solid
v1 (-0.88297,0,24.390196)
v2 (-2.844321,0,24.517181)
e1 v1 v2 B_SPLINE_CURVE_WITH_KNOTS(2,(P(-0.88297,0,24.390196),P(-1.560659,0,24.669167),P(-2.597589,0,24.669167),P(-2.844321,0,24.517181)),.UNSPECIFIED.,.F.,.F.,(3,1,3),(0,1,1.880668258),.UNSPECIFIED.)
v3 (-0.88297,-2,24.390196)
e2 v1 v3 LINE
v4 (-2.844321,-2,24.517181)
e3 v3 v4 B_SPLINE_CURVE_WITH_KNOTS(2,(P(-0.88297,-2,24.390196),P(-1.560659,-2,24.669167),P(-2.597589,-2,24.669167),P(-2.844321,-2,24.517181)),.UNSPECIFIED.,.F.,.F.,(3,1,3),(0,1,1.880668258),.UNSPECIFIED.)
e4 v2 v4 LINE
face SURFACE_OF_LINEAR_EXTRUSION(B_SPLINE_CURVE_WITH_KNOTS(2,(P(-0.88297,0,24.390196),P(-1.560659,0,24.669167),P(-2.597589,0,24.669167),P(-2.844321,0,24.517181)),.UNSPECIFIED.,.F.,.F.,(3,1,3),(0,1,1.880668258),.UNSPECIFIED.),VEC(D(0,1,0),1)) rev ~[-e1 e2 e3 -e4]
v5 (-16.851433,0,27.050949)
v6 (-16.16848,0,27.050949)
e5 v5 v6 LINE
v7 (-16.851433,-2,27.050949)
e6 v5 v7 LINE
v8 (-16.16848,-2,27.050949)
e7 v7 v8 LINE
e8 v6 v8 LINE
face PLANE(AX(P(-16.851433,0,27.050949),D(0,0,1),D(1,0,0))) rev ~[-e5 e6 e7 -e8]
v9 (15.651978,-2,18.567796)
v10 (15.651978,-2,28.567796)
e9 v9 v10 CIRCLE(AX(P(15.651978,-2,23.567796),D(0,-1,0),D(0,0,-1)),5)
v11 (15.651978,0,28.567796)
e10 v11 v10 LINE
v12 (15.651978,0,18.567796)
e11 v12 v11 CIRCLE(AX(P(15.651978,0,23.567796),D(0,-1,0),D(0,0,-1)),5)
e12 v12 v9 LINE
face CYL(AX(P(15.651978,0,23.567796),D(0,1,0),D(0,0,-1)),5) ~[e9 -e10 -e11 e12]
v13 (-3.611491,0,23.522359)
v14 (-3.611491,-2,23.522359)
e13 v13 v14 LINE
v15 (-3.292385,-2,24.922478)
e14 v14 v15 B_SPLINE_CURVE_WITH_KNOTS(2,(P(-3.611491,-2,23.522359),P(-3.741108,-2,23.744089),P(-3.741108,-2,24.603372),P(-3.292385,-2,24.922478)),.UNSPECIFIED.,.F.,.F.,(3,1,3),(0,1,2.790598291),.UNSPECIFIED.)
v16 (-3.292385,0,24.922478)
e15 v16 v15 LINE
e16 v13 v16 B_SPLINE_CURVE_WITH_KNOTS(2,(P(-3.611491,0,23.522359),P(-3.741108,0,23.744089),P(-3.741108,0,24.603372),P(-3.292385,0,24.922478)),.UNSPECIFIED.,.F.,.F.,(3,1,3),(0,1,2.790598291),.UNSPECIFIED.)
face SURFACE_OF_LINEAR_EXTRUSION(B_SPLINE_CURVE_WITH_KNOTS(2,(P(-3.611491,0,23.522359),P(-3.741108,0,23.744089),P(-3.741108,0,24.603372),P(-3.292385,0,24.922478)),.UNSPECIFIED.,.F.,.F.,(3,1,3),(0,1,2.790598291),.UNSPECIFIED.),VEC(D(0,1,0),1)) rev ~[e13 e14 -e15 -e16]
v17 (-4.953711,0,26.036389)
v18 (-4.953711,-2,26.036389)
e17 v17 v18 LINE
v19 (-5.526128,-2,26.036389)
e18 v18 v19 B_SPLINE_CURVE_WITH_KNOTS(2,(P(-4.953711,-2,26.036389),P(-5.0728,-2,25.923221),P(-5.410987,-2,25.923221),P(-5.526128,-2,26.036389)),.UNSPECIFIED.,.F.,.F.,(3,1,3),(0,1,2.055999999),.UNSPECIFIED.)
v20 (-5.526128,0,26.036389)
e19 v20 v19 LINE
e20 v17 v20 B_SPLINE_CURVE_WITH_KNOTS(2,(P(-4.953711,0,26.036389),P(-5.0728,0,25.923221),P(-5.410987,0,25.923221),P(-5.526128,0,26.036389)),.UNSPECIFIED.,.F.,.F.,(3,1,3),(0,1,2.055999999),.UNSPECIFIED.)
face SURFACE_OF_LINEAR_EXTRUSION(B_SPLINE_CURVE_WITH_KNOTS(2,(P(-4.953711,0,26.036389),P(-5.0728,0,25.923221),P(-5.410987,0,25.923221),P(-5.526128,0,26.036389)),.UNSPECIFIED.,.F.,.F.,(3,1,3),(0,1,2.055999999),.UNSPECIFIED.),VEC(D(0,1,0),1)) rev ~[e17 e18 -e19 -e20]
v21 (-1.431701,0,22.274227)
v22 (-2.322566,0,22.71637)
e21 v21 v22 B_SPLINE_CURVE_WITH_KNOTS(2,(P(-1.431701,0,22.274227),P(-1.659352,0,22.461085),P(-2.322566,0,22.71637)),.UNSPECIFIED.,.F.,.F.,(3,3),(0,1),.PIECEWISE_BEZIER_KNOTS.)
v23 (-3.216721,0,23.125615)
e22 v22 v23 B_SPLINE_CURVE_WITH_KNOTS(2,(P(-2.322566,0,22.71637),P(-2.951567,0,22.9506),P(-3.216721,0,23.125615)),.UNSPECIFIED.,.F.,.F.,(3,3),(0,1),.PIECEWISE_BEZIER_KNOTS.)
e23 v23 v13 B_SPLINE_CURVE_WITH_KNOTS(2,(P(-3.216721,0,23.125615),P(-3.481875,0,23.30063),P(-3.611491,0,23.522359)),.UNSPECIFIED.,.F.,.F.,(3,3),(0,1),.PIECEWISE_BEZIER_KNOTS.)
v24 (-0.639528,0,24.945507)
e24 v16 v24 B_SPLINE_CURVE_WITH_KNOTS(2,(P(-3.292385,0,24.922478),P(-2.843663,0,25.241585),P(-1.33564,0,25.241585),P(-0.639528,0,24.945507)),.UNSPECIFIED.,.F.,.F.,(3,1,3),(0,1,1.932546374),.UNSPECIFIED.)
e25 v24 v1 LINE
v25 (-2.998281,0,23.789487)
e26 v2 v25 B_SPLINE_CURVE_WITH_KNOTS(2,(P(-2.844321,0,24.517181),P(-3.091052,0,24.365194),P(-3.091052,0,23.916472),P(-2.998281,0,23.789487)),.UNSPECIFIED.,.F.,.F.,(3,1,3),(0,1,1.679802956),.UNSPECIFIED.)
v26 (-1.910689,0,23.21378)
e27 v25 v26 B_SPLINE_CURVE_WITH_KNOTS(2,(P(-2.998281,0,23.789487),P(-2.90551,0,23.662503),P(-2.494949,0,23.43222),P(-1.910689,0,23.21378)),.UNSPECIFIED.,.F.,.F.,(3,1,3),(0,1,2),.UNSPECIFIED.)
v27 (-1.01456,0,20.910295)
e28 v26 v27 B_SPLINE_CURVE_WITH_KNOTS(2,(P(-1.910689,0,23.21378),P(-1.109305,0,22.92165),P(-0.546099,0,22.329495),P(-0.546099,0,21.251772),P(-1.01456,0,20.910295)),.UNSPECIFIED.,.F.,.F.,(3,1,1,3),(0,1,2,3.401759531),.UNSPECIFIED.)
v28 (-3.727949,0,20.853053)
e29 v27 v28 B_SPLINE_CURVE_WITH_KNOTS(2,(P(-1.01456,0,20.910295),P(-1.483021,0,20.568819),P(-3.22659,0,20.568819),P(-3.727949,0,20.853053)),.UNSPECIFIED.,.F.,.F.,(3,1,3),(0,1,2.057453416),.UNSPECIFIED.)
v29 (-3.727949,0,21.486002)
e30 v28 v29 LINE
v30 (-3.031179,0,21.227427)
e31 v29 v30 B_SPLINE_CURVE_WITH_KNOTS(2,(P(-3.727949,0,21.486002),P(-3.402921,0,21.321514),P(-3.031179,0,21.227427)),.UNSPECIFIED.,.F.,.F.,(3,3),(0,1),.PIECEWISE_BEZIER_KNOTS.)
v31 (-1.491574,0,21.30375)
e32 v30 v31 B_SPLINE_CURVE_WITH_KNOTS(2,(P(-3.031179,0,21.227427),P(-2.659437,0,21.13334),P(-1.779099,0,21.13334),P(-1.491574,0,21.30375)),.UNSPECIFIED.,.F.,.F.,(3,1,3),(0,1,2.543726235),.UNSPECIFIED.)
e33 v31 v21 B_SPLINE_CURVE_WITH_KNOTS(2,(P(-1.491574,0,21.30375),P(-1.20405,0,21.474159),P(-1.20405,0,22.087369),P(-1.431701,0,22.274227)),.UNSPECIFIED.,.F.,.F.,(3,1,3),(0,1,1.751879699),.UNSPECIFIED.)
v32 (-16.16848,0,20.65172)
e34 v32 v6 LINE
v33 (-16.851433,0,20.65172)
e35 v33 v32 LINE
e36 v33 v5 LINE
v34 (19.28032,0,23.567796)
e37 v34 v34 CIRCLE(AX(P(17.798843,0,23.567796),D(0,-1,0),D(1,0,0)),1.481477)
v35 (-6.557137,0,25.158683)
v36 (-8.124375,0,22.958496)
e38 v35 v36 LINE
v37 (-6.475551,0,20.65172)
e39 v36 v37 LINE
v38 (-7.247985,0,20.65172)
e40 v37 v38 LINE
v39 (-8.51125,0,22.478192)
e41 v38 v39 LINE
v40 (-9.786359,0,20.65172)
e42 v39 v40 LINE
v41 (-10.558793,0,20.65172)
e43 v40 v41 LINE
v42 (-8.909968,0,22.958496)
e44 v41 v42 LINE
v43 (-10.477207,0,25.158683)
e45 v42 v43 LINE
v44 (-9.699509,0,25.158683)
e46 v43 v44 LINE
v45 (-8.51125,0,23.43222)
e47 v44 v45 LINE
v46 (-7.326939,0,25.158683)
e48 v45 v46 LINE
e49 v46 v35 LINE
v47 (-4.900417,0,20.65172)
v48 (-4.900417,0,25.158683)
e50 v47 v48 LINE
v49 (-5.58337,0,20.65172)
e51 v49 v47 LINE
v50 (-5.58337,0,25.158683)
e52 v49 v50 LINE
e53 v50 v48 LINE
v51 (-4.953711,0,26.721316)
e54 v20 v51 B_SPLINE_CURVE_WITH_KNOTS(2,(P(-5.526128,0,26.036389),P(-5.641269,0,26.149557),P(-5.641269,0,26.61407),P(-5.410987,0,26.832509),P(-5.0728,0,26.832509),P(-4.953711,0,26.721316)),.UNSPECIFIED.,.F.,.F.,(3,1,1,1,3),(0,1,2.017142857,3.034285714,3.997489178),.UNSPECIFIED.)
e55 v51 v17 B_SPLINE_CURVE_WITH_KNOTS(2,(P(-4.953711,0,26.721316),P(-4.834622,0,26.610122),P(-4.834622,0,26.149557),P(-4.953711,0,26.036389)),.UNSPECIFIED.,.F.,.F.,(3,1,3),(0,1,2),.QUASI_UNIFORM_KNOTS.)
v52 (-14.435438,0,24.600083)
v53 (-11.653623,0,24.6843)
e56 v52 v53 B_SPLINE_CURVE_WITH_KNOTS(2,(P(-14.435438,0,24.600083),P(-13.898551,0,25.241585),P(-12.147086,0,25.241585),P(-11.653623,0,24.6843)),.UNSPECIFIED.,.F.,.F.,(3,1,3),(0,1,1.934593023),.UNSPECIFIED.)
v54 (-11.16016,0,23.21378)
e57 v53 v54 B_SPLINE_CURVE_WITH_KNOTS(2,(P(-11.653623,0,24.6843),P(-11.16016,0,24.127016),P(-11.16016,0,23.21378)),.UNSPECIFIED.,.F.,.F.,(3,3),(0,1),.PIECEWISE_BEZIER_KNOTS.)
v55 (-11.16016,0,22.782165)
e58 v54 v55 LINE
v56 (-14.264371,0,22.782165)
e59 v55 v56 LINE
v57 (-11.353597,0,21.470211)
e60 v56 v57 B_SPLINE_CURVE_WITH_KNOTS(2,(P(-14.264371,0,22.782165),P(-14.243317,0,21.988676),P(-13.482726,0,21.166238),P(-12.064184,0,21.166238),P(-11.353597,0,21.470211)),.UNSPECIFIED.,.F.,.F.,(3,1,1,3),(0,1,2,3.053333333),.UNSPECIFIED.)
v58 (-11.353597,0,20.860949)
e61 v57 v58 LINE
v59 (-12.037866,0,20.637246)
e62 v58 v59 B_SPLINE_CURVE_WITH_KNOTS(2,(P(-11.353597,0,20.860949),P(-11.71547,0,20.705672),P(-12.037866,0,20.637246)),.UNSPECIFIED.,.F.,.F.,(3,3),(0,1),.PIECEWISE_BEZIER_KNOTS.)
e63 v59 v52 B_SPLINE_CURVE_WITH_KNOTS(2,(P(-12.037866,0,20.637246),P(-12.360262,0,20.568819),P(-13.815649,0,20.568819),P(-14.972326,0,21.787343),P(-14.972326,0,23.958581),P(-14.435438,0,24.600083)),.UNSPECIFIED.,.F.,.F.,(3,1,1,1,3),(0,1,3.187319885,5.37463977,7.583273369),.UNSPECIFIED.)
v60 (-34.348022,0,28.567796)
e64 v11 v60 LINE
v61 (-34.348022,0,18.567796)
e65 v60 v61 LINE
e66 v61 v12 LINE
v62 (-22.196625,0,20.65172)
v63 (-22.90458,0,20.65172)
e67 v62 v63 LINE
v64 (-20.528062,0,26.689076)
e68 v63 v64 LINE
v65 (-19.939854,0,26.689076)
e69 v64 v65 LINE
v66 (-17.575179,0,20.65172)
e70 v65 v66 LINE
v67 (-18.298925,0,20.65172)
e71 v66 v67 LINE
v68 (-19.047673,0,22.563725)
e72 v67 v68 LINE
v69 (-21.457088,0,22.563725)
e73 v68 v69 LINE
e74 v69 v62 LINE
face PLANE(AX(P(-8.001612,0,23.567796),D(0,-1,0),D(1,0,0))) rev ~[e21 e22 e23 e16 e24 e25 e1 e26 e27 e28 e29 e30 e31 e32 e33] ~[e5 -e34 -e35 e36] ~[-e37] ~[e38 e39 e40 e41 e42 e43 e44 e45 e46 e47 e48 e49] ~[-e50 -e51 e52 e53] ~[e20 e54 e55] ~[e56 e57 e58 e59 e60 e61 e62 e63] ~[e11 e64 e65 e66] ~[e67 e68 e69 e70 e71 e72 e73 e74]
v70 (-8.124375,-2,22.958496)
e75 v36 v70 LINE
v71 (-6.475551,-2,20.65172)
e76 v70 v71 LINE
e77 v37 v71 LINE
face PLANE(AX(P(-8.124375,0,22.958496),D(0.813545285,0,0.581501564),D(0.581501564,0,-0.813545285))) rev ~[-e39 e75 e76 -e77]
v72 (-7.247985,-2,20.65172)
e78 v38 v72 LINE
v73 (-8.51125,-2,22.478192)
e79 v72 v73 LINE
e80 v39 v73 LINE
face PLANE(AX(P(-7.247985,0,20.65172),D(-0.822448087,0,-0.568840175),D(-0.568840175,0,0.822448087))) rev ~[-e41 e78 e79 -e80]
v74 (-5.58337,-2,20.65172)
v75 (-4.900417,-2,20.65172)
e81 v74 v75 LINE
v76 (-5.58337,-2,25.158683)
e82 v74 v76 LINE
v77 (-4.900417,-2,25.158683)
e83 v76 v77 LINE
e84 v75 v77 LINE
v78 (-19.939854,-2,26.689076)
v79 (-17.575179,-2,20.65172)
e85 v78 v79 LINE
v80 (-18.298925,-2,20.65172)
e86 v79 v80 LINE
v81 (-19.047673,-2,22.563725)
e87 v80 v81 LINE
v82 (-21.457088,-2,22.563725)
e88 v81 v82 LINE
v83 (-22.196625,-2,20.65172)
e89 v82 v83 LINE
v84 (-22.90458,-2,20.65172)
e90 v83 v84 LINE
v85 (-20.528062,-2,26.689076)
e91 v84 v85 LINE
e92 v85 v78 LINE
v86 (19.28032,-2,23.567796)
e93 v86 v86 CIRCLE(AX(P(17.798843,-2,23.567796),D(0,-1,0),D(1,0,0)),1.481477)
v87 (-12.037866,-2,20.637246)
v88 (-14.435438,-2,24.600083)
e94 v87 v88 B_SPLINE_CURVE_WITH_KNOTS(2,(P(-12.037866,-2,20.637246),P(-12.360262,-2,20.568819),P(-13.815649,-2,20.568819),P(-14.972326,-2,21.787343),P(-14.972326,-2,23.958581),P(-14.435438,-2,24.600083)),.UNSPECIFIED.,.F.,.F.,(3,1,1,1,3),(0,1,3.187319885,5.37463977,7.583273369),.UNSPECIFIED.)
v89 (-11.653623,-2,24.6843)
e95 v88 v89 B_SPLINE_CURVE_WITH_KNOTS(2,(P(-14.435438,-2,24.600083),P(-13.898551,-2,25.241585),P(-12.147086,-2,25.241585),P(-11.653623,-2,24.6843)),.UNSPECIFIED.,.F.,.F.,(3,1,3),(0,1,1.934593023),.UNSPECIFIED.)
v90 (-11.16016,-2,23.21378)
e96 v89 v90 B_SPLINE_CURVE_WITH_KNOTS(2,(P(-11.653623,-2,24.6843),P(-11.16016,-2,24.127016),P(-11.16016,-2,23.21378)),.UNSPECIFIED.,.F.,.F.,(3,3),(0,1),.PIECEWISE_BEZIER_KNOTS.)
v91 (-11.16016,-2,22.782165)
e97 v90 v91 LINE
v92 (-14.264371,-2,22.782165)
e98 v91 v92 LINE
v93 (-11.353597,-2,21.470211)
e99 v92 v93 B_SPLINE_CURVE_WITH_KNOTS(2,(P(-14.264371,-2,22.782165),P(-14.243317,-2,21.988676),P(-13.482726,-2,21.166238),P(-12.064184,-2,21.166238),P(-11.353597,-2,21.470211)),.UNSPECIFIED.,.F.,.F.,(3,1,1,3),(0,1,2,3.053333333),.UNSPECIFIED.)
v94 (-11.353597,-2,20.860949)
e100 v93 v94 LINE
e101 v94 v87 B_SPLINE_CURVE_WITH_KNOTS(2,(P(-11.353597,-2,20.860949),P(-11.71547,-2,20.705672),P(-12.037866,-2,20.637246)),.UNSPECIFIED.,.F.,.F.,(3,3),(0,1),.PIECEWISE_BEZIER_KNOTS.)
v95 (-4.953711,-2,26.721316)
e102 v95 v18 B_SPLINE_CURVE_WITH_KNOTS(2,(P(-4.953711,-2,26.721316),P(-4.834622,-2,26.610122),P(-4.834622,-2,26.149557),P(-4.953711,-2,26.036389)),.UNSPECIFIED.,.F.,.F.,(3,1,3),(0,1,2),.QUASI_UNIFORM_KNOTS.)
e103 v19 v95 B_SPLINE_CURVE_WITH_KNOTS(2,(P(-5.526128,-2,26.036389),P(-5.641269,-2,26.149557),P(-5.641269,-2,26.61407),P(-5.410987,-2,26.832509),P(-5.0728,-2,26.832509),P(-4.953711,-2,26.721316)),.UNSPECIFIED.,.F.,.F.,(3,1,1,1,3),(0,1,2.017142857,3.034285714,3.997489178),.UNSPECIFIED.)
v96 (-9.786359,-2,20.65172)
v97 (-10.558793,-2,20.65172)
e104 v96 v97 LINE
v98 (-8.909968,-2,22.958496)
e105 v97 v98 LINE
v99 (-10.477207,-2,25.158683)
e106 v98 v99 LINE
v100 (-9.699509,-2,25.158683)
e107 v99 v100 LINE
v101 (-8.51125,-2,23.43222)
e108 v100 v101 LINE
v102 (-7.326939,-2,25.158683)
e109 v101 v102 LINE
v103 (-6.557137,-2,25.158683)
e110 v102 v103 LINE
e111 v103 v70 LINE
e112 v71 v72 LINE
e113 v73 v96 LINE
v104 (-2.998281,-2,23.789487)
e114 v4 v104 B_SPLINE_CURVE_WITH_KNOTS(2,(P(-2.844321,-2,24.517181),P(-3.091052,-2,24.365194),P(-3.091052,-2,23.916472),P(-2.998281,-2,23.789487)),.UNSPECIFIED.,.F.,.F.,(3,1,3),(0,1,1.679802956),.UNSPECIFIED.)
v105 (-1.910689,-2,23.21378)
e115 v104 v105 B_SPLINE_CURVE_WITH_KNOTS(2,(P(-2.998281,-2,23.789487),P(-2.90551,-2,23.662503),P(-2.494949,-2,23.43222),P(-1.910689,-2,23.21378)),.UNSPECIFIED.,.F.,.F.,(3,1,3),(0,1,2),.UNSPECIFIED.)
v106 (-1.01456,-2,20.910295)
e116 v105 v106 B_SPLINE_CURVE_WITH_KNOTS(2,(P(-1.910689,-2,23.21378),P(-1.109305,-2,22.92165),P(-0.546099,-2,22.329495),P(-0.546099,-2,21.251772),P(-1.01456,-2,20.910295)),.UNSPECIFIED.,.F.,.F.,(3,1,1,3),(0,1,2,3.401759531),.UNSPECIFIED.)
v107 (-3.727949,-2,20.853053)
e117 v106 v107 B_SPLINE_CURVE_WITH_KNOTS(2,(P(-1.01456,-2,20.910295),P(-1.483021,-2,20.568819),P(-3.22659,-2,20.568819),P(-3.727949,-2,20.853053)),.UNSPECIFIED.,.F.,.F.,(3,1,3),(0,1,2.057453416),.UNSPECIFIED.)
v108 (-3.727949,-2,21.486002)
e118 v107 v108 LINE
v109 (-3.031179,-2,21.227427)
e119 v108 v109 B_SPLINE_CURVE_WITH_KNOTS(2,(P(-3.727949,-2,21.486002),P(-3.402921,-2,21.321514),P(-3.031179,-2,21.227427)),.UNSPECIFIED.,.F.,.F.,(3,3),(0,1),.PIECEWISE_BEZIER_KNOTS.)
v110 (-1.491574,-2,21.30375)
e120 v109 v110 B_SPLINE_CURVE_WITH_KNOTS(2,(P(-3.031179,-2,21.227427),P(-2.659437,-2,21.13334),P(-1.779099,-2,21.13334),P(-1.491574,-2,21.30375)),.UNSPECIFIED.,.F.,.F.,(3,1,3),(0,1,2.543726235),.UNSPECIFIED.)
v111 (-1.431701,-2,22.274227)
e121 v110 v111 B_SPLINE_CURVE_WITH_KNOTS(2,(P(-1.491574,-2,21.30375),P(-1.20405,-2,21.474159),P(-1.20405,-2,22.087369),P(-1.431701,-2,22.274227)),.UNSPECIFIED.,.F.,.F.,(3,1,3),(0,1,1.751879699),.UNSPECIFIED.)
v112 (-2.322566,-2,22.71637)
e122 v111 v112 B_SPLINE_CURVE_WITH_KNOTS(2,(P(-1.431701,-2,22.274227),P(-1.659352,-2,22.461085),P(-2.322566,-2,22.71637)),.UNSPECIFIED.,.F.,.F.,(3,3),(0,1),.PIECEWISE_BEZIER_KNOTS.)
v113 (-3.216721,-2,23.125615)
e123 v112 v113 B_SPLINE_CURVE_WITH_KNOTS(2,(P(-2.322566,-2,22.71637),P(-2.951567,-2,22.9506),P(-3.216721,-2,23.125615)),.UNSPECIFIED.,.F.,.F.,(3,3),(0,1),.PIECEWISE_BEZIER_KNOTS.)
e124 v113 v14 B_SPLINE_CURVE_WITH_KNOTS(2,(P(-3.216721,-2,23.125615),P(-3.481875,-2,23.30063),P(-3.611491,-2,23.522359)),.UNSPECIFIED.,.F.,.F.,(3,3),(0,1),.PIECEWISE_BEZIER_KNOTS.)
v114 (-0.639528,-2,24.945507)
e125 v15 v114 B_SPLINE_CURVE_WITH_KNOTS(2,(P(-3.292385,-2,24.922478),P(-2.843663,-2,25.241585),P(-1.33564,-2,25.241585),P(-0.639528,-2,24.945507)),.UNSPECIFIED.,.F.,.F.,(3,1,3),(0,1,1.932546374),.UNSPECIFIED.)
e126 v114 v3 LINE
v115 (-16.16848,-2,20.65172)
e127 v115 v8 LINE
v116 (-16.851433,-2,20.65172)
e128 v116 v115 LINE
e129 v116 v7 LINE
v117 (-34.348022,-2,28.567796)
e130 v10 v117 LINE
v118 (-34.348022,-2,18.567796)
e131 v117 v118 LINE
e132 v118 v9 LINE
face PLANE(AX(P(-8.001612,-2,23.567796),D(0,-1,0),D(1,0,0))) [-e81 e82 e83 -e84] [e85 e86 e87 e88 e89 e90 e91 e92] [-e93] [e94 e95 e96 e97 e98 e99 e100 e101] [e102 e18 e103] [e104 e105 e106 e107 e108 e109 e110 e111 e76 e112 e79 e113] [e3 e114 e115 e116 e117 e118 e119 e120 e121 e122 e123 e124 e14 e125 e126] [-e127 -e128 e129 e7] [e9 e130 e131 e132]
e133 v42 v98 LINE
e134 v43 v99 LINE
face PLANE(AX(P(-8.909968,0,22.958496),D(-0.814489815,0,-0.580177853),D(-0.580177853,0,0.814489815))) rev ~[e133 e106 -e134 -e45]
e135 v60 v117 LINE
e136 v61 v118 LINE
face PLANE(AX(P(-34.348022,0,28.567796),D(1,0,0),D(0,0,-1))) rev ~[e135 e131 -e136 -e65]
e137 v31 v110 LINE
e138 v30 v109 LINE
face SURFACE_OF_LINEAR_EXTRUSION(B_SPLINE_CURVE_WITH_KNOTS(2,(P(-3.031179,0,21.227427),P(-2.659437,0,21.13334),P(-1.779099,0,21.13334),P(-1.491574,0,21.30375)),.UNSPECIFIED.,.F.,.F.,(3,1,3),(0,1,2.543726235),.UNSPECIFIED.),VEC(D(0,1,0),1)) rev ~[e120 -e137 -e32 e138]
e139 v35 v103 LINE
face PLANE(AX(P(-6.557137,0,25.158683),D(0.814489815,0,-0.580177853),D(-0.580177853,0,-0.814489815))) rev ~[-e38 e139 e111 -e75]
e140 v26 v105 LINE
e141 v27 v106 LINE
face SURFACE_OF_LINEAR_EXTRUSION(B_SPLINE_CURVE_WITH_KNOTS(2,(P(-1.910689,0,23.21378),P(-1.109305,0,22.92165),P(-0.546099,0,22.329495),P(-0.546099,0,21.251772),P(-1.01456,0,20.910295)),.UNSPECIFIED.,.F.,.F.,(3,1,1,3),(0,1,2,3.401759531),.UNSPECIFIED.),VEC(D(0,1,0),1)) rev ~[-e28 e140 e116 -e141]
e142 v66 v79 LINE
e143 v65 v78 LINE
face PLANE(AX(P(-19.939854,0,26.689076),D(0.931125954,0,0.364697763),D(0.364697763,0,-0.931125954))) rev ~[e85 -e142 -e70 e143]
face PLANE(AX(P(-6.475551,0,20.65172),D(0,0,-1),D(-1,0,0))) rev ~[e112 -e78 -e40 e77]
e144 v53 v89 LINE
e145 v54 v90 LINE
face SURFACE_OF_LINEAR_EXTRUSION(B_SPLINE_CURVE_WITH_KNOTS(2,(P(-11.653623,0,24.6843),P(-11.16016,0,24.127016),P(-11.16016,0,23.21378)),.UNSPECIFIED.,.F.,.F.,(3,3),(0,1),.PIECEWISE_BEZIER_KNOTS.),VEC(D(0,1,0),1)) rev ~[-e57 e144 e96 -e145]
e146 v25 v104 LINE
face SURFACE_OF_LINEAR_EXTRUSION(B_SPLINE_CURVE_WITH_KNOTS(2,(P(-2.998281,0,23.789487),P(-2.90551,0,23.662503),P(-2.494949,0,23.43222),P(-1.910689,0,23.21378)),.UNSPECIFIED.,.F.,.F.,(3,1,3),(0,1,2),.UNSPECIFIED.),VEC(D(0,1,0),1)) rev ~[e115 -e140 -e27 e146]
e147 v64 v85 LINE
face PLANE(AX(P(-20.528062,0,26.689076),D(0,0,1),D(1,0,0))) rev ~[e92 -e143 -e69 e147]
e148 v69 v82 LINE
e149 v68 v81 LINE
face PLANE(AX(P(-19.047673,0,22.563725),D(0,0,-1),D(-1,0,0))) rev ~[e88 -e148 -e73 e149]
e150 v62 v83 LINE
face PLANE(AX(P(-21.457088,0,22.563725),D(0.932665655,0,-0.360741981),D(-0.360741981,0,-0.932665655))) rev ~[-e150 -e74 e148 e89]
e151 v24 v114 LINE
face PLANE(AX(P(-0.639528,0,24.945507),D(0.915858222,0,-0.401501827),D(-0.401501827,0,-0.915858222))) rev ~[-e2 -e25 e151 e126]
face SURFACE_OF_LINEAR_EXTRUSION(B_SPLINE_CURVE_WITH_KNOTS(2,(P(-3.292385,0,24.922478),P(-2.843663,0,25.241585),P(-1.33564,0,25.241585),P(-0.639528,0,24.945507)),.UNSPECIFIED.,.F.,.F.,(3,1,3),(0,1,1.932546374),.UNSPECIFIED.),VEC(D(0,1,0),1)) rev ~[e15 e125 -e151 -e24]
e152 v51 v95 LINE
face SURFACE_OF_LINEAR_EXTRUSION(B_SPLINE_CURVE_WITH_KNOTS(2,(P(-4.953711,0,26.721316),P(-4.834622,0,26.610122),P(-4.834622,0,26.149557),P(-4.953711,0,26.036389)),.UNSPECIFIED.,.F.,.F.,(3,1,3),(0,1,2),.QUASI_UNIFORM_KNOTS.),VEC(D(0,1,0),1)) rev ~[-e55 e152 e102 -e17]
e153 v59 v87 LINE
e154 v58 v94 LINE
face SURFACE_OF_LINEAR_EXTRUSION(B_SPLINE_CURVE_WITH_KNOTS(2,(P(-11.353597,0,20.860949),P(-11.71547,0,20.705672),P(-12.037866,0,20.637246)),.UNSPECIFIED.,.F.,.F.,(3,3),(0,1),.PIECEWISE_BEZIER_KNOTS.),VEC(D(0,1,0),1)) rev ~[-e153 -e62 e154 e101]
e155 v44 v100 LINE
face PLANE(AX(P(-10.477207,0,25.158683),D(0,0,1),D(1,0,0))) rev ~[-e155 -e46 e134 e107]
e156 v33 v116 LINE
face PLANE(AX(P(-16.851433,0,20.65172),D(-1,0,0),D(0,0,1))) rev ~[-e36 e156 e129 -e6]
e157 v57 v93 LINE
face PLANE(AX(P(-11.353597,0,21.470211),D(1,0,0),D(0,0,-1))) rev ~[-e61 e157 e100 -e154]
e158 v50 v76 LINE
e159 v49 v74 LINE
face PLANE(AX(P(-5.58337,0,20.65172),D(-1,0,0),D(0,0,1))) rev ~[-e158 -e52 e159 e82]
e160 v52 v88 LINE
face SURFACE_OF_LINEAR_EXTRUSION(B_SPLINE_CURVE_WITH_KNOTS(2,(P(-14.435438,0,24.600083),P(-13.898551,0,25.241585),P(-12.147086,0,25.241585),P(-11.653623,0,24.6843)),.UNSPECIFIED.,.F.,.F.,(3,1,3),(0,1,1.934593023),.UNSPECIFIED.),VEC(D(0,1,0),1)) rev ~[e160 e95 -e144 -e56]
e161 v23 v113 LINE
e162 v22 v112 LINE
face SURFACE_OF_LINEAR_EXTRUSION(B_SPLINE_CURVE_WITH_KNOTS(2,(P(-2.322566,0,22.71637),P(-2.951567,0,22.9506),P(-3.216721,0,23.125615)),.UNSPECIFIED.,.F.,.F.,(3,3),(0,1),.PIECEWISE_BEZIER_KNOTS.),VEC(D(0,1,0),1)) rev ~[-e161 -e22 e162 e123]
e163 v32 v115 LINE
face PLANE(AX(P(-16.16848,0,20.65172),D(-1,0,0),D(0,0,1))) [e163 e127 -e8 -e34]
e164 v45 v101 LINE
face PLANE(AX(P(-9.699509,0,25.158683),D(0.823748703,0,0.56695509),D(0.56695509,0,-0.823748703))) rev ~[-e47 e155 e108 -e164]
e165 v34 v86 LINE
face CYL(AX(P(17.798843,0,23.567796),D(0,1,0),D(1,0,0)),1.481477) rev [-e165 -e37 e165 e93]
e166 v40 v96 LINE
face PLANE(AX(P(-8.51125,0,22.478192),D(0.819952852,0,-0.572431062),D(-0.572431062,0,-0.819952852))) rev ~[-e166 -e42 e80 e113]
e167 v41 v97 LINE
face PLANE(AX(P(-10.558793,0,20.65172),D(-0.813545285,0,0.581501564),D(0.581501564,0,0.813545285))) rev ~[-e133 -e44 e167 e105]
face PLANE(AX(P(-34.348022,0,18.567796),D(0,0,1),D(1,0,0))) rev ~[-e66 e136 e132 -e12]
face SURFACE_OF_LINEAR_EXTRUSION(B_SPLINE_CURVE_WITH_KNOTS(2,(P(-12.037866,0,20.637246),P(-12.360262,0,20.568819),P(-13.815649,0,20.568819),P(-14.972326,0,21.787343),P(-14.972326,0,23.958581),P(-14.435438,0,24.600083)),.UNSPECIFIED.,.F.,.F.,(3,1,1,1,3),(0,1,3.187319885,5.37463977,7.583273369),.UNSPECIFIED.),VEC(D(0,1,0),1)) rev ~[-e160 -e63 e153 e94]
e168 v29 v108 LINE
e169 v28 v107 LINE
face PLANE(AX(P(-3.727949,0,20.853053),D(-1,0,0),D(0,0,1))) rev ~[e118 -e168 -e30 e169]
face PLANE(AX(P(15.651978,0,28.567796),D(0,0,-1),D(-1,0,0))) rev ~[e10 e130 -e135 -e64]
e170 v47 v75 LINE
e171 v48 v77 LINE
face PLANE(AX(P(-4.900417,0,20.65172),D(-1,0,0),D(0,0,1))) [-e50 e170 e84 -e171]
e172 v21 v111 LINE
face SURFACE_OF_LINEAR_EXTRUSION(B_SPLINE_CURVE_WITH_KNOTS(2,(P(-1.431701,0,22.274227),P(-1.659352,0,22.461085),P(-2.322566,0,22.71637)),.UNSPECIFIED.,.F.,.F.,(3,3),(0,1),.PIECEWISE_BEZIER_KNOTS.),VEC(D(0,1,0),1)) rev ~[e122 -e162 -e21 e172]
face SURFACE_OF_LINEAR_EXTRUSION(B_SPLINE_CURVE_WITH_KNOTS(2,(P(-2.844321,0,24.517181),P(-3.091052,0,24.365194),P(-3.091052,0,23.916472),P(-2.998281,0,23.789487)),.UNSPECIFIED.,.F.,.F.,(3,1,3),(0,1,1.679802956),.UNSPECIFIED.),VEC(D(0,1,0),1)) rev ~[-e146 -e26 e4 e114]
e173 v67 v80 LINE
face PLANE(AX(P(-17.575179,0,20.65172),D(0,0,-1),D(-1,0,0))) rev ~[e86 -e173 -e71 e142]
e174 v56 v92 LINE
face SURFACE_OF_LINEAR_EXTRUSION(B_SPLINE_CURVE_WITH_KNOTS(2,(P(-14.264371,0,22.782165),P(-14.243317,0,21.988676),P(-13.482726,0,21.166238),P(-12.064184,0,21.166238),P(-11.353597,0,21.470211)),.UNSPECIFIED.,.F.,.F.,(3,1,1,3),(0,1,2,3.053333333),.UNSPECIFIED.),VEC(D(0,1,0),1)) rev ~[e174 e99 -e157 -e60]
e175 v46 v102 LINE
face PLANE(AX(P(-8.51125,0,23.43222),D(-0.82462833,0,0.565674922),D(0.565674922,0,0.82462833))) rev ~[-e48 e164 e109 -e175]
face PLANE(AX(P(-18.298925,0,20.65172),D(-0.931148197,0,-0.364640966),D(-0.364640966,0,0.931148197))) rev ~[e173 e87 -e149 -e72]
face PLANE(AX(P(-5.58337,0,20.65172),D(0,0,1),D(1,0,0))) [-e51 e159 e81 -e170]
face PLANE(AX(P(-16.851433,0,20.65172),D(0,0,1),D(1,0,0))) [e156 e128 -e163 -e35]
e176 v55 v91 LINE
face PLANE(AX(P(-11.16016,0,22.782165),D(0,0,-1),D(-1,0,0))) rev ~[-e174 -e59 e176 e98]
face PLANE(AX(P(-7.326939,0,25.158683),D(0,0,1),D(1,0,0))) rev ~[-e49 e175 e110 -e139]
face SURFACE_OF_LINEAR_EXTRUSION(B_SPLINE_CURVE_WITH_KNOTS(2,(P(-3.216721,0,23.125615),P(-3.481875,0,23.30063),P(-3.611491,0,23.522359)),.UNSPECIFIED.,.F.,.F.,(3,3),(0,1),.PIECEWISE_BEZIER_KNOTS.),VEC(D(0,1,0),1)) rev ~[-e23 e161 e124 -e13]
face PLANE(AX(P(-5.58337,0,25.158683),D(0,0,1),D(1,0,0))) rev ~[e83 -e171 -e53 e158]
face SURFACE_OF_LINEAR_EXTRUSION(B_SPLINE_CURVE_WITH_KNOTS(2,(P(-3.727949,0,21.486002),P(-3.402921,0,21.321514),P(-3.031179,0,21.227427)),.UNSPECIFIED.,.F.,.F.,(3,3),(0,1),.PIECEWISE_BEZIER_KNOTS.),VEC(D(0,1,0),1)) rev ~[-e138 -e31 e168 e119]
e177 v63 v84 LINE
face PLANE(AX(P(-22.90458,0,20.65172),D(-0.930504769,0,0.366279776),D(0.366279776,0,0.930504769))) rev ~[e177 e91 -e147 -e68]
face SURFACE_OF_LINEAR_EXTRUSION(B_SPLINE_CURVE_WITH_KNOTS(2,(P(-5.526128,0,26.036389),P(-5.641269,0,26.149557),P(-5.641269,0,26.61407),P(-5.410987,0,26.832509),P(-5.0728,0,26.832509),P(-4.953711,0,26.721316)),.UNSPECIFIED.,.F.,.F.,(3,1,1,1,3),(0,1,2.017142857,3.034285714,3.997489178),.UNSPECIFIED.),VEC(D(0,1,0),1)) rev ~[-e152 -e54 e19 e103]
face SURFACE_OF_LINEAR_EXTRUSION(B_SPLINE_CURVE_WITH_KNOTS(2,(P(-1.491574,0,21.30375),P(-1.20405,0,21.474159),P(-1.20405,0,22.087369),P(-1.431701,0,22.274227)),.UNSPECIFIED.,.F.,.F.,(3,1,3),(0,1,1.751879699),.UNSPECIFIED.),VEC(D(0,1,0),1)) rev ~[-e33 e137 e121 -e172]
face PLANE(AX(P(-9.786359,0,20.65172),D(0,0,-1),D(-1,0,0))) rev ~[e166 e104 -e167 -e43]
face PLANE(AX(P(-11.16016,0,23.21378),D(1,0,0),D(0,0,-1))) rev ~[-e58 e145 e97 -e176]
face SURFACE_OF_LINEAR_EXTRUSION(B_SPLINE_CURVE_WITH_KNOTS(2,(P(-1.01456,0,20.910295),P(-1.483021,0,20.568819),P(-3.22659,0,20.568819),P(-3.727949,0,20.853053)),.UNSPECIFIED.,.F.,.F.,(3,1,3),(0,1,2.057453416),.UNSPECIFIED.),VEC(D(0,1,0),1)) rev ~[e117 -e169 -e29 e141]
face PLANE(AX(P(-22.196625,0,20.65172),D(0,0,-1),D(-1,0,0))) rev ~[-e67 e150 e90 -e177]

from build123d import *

# Parameters (mm, degrees)
F0_W     = 0.6829528259
F0_H     = 4.5069622906
F0_H_2   = 6.3992285019
F0_R     = 1.4814772489
F1_DEPTH = 2


with BuildPart() as f1:
    # F0 (on Front) → F1 (new body)
    with BuildSketch(Plane.XZ):
        with BuildLine():
            Line((15.6519781798, 28.567796193), (-34.3480218202, 28.567796193))
            Line((-34.3480218202, 28.567796193), (-34.3480218202, 18.567796193))
            Line((-34.3480218202, 18.567796193), (15.6519781798, 18.567796193))
            ThreePointArc((15.6519781798, 18.567796193), (20.6519781798, 23.567796193), (15.6519781798, 28.567796193))
        make_face()
        with BuildLine():
            add(Edge.make_bspline(
                [(-12.0378659954, 20.6372455488), (-12.3602618381, 20.5688186761), (-12.8168796234, 20.5688186761)],
                knots=[0, 0, 0, 1, 1, 1], degree=2))
            add(Edge.make_bspline(
                [(-12.8168796234, 20.5688186761), (-13.8156487851, 20.5688186761), (-14.3939874498, 21.1780810237)],
                knots=[0, 0, 0, 1, 1, 1], degree=2))
            add(Edge.make_bspline(
                [(-14.3939874498, 21.1780810237), (-14.9723261145, 21.7873433713), (-14.9723261145, 22.8676984197)],
                knots=[0, 0, 0, 1, 1, 1], degree=2))
            add(Edge.make_bspline(
                [(-14.9723261145, 22.8676984197), (-14.9723261145, 23.9585806792), (-14.4354383439, 24.6000826111)],
                knots=[0, 0, 0, 1, 1, 1], degree=2))
            add(Edge.make_bspline(
                [(-14.4354383439, 24.6000826111), (-13.8985505732, 25.2415845429), (-12.9932104109, 25.2415845429)],
                knots=[0, 0, 0, 1, 1, 1], degree=2))
            add(Edge.make_bspline(
                [(-12.9932104109, 25.2415845429), (-12.1470858115, 25.2415845429), (-11.653622787, 24.6843003006)],
                knots=[0, 0, 0, 1, 1, 1], degree=2))
            add(Edge.make_bspline(
                [(-11.653622787, 24.6843003006), (-11.1601597625, 24.1270160582), (-11.1601597625, 23.2137804875)],
                knots=[0, 0, 0, 1, 1, 1], degree=2))
            Line((-11.1601597625, 23.2137804875), (-11.1601597625, 22.7821648287))
            Line((-11.1601597625, 22.7821648287), (-14.264371162, 22.7821648287))
            add(Edge.make_bspline(
                [(-14.264371162, 22.7821648287), (-14.2433167396, 21.9886762853), (-13.8630212354, 21.5774570982)],
                knots=[0, 0, 0, 1, 1, 1], degree=2))
            add(Edge.make_bspline(
                [(-13.8630212354, 21.5774570982), (-13.4827257312, 21.1662379111), (-12.7918774969, 21.1662379111)],
                knots=[0, 0, 0, 1, 1, 1], degree=2))
            add(Edge.make_bspline(
                [(-12.7918774969, 21.1662379111), (-12.0641840234, 21.1662379111), (-11.3535972681, 21.4702111342)],
                knots=[0, 0, 0, 1, 1, 1], degree=2))
            Line((-11.3535972681, 21.4702111342), (-11.3535972681, 20.8609487866))
            add(Edge.make_bspline(
                [(-11.3535972681, 20.8609487866), (-11.7154701527, 20.7056724216), (-12.0378659954, 20.6372455488)],
                knots=[0, 0, 0, 1, 1, 1], degree=2))
        make_face(mode=Mode.SUBTRACT)
        Polygon((-10.5587928233, 20.6517204642), (-8.9099683707, 22.9584956162), (-10.4772069365, 25.1586827548), (-9.6995092099, 25.1586827548), (-8.5112502469, 23.4322201197), (-7.326938988, 25.1586827548), (-6.5571366698, 25.1586827548), (-8.1243752356, 22.9584956162), (-6.4755507831, 20.6517204642), (-7.2479849041, 20.6517204642), (-8.5112502469, 22.4781916056), (-9.7863587022, 20.6517204642), align=None, mode=Mode.SUBTRACT)
        with Locations((-5.2418932218, 22.9052016095)):
            Rectangle(F0_W, F0_H, mode=Mode.SUBTRACT)
        with BuildLine():
            add(Edge.make_bspline(
                [(-0.8277019798, 22.6255725623), (-0.5460990805, 22.3294947476), (-0.5460990805, 21.8807723706)],
                knots=[0, 0, 0, 1, 1, 1], degree=2))
            add(Edge.make_bspline(
                [(-0.5460990805, 21.8807723706), (-0.5460990805, 21.251771502), (-1.0145599784, 20.9102950891)],
                knots=[0, 0, 0, 1, 1, 1], degree=2))
            add(Edge.make_bspline(
                [(-1.0145599784, 20.9102950891), (-1.4830208763, 20.5688186761), (-2.3304613771, 20.5688186761)],
                knots=[0, 0, 0, 1, 1, 1], degree=2))
            add(Edge.make_bspline(
                [(-2.3304613771, 20.5688186761), (-3.2265902296, 20.5688186761), (-3.7279486625, 20.8530533782)],
                knots=[0, 0, 0, 1, 1, 1], degree=2))
            Line((-3.7279486625, 20.8530533782), (-3.7279486625, 21.486001951))
            add(Edge.make_bspline(
                [(-3.7279486625, 21.486001951), (-3.4029210171, 21.3215142762), (-3.0311788719, 21.2274273262)],
                knots=[0, 0, 0, 1, 1, 1], degree=2))
            add(Edge.make_bspline(
                [(-3.0311788719, 21.2274273262), (-2.6594367268, 21.1333403762), (-2.3133546589, 21.1333403762)],
                knots=[0, 0, 0, 1, 1, 1], degree=2))
            add(Edge.make_bspline(
                [(-2.3133546589, 21.1333403762), (-1.7790986911, 21.1333403762), (-1.4915742354, 21.3037496073)],
                knots=[0, 0, 0, 1, 1, 1], degree=2))
            add(Edge.make_bspline(
                [(-1.4915742354, 21.3037496073), (-1.2040497798, 21.4741588384), (-1.2040497798, 21.8241886105)],
                knots=[0, 0, 0, 1, 1, 1], degree=2))
            add(Edge.make_bspline(
                [(-1.2040497798, 21.8241886105), (-1.2040497798, 22.0873688902), (-1.4317007218, 22.2742268888)],
                knots=[0, 0, 0, 1, 1, 1], degree=2))
            add(Edge.make_bspline(
                [(-1.4317007218, 22.2742268888), (-1.6593516638, 22.4610848875), (-2.3225659687, 22.7163697588)],
                knots=[0, 0, 0, 1, 1, 1], degree=2))
            add(Edge.make_bspline(
                [(-2.3225659687, 22.7163697588), (-2.9515668373, 22.9506002078), (-3.2167209691, 23.1256150938)],
                knots=[0, 0, 0, 1, 1, 1], degree=2))
            add(Edge.make_bspline(
                [(-3.2167209691, 23.1256150938), (-3.481875101, 23.3006299798), (-3.6114913888, 23.5223593655)],
                knots=[0, 0, 0, 1, 1, 1], degree=2))
            add(Edge.make_bspline(
                [(-3.6114913888, 23.5223593655), (-3.7411076765, 23.7440887512), (-3.7411076765, 24.0520096785)],
                knots=[0, 0, 0, 1, 1, 1], degree=2))
            add(Edge.make_bspline(
                [(-3.7411076765, 24.0520096785), (-3.7411076765, 24.6033723646), (-3.2923852996, 24.9224784537)],
                knots=[0, 0, 0, 1, 1, 1], degree=2))
            add(Edge.make_bspline(
                [(-3.2923852996, 24.9224784537), (-2.8436629226, 25.2415845429), (-2.0633333932, 25.2415845429)],
                knots=[0, 0, 0, 1, 1, 1], degree=2))
            add(Edge.make_bspline(
                [(-2.0633333932, 25.2415845429), (-1.3356399197, 25.2415845429), (-0.6395280798, 24.9455067282)],
                knots=[0, 0, 0, 1, 1, 1], degree=2))
            Line((-0.6395280798, 24.9455067282), (-0.8829698385, 24.390196338))
            add(Edge.make_bspline(
                [(-0.8829698385, 24.390196338), (-1.5606590589, 24.6691674345), (-2.1120217449, 24.6691674345)],
                knots=[0, 0, 0, 1, 1, 1], degree=2))
            add(Edge.make_bspline(
                [(-2.1120217449, 24.6691674345), (-2.5975893611, 24.6691674345), (-2.8443208733, 24.5171808229)],
                knots=[0, 0, 0, 1, 1, 1], degree=2))
            add(Edge.make_bspline(
                [(-2.8443208733, 24.5171808229), (-3.0910523856, 24.3651942114), (-3.0910523856, 24.0980662275)],
                knots=[0, 0, 0, 1, 1, 1], degree=2))
            add(Edge.make_bspline(
                [(-3.0910523856, 24.0980662275), (-3.0910523856, 23.9164718344), (-2.998281337, 23.7894873495)],
                knots=[0, 0, 0, 1, 1, 1], degree=2))
            add(Edge.make_bspline(
                [(-2.998281337, 23.7894873495), (-2.9055102884, 23.6625028645), (-2.7002296702, 23.5473614921)],
                knots=[0, 0, 0, 1, 1, 1], degree=2))
            add(Edge.make_bspline(
                [(-2.7002296702, 23.5473614921), (-2.494949052, 23.4322201197), (-1.9106888309, 23.2137804875)],
                knots=[0, 0, 0, 1, 1, 1], degree=2))
            add(Edge.make_bspline(
                [(-1.9106888309, 23.2137804875), (-1.1093048791, 22.921650377), (-0.8277019798, 22.6255725623)],
                knots=[0, 0, 0, 1, 1, 1], degree=2))
        make_face(mode=Mode.SUBTRACT)
        Polygon((-17.5751790812, 20.6517204642), (-18.2989248505, 20.6517204642), (-19.0476727463, 22.5637251966), (-21.4570882074, 22.5637251966), (-22.1966247934, 20.6517204642), (-22.904579746, 20.6517204642), (-20.5280618199, 26.6890760815), (-19.9398538947, 26.6890760815), align=None, mode=Mode.SUBTRACT)
        with Locations((-16.5099568989, 23.8513347152)):
            Rectangle(F0_W, F0_H_2, mode=Mode.SUBTRACT)
        with Locations((17.7988428622, 23.567796193)):
            Circle(F0_R, mode=Mode.SUBTRACT)
        with BuildLine():
            add(Edge.make_bspline(
                [(-5.5261279239, 26.0363889878), (-5.6412692963, 26.149556508), (-5.6412692963, 26.3798392528)],
                knots=[0, 0, 0, 1, 1, 1], degree=2))
            add(Edge.make_bspline(
                [(-5.6412692963, 26.3798392528), (-5.6412692963, 26.6140697018), (-5.5261279239, 26.7232895179)],
                knots=[0, 0, 0, 1, 1, 1], degree=2))
            add(Edge.make_bspline(
                [(-5.5261279239, 26.7232895179), (-5.4109865515, 26.832509334), (-5.2372875669, 26.832509334)],
                knots=[0, 0, 0, 1, 1, 1], degree=2))
            add(Edge.make_bspline(
                [(-5.2372875669, 26.832509334), (-5.072799892, 26.832509334), (-4.9537108154, 26.7213156658)],
                knots=[0, 0, 0, 1, 1, 1], degree=2))
            add(Edge.make_bspline(
                [(-4.9537108154, 26.7213156658), (-4.8346217389, 26.6101219976), (-4.8346217389, 26.3798392528)],
                knots=[0, 0, 0, 1, 1, 1], degree=2))
            add(Edge.make_bspline(
                [(-4.8346217389, 26.3798392528), (-4.8346217389, 26.149556508), (-4.9537108154, 26.0363889878)],
                knots=[0, 0, 0, 1, 1, 1], degree=2))
            add(Edge.make_bspline(
                [(-4.9537108154, 26.0363889878), (-5.072799892, 25.9232214675), (-5.2372875669, 25.9232214675)],
                knots=[0, 0, 0, 1, 1, 1], degree=2))
            add(Edge.make_bspline(
                [(-5.2372875669, 25.9232214675), (-5.4109865515, 25.9232214675), (-5.5261279239, 26.0363889878)],
                knots=[0, 0, 0, 1, 1, 1], degree=2))
        make_face(mode=Mode.SUBTRACT)
    extrude(amount=F1_DEPTH)


solid = f1.part
